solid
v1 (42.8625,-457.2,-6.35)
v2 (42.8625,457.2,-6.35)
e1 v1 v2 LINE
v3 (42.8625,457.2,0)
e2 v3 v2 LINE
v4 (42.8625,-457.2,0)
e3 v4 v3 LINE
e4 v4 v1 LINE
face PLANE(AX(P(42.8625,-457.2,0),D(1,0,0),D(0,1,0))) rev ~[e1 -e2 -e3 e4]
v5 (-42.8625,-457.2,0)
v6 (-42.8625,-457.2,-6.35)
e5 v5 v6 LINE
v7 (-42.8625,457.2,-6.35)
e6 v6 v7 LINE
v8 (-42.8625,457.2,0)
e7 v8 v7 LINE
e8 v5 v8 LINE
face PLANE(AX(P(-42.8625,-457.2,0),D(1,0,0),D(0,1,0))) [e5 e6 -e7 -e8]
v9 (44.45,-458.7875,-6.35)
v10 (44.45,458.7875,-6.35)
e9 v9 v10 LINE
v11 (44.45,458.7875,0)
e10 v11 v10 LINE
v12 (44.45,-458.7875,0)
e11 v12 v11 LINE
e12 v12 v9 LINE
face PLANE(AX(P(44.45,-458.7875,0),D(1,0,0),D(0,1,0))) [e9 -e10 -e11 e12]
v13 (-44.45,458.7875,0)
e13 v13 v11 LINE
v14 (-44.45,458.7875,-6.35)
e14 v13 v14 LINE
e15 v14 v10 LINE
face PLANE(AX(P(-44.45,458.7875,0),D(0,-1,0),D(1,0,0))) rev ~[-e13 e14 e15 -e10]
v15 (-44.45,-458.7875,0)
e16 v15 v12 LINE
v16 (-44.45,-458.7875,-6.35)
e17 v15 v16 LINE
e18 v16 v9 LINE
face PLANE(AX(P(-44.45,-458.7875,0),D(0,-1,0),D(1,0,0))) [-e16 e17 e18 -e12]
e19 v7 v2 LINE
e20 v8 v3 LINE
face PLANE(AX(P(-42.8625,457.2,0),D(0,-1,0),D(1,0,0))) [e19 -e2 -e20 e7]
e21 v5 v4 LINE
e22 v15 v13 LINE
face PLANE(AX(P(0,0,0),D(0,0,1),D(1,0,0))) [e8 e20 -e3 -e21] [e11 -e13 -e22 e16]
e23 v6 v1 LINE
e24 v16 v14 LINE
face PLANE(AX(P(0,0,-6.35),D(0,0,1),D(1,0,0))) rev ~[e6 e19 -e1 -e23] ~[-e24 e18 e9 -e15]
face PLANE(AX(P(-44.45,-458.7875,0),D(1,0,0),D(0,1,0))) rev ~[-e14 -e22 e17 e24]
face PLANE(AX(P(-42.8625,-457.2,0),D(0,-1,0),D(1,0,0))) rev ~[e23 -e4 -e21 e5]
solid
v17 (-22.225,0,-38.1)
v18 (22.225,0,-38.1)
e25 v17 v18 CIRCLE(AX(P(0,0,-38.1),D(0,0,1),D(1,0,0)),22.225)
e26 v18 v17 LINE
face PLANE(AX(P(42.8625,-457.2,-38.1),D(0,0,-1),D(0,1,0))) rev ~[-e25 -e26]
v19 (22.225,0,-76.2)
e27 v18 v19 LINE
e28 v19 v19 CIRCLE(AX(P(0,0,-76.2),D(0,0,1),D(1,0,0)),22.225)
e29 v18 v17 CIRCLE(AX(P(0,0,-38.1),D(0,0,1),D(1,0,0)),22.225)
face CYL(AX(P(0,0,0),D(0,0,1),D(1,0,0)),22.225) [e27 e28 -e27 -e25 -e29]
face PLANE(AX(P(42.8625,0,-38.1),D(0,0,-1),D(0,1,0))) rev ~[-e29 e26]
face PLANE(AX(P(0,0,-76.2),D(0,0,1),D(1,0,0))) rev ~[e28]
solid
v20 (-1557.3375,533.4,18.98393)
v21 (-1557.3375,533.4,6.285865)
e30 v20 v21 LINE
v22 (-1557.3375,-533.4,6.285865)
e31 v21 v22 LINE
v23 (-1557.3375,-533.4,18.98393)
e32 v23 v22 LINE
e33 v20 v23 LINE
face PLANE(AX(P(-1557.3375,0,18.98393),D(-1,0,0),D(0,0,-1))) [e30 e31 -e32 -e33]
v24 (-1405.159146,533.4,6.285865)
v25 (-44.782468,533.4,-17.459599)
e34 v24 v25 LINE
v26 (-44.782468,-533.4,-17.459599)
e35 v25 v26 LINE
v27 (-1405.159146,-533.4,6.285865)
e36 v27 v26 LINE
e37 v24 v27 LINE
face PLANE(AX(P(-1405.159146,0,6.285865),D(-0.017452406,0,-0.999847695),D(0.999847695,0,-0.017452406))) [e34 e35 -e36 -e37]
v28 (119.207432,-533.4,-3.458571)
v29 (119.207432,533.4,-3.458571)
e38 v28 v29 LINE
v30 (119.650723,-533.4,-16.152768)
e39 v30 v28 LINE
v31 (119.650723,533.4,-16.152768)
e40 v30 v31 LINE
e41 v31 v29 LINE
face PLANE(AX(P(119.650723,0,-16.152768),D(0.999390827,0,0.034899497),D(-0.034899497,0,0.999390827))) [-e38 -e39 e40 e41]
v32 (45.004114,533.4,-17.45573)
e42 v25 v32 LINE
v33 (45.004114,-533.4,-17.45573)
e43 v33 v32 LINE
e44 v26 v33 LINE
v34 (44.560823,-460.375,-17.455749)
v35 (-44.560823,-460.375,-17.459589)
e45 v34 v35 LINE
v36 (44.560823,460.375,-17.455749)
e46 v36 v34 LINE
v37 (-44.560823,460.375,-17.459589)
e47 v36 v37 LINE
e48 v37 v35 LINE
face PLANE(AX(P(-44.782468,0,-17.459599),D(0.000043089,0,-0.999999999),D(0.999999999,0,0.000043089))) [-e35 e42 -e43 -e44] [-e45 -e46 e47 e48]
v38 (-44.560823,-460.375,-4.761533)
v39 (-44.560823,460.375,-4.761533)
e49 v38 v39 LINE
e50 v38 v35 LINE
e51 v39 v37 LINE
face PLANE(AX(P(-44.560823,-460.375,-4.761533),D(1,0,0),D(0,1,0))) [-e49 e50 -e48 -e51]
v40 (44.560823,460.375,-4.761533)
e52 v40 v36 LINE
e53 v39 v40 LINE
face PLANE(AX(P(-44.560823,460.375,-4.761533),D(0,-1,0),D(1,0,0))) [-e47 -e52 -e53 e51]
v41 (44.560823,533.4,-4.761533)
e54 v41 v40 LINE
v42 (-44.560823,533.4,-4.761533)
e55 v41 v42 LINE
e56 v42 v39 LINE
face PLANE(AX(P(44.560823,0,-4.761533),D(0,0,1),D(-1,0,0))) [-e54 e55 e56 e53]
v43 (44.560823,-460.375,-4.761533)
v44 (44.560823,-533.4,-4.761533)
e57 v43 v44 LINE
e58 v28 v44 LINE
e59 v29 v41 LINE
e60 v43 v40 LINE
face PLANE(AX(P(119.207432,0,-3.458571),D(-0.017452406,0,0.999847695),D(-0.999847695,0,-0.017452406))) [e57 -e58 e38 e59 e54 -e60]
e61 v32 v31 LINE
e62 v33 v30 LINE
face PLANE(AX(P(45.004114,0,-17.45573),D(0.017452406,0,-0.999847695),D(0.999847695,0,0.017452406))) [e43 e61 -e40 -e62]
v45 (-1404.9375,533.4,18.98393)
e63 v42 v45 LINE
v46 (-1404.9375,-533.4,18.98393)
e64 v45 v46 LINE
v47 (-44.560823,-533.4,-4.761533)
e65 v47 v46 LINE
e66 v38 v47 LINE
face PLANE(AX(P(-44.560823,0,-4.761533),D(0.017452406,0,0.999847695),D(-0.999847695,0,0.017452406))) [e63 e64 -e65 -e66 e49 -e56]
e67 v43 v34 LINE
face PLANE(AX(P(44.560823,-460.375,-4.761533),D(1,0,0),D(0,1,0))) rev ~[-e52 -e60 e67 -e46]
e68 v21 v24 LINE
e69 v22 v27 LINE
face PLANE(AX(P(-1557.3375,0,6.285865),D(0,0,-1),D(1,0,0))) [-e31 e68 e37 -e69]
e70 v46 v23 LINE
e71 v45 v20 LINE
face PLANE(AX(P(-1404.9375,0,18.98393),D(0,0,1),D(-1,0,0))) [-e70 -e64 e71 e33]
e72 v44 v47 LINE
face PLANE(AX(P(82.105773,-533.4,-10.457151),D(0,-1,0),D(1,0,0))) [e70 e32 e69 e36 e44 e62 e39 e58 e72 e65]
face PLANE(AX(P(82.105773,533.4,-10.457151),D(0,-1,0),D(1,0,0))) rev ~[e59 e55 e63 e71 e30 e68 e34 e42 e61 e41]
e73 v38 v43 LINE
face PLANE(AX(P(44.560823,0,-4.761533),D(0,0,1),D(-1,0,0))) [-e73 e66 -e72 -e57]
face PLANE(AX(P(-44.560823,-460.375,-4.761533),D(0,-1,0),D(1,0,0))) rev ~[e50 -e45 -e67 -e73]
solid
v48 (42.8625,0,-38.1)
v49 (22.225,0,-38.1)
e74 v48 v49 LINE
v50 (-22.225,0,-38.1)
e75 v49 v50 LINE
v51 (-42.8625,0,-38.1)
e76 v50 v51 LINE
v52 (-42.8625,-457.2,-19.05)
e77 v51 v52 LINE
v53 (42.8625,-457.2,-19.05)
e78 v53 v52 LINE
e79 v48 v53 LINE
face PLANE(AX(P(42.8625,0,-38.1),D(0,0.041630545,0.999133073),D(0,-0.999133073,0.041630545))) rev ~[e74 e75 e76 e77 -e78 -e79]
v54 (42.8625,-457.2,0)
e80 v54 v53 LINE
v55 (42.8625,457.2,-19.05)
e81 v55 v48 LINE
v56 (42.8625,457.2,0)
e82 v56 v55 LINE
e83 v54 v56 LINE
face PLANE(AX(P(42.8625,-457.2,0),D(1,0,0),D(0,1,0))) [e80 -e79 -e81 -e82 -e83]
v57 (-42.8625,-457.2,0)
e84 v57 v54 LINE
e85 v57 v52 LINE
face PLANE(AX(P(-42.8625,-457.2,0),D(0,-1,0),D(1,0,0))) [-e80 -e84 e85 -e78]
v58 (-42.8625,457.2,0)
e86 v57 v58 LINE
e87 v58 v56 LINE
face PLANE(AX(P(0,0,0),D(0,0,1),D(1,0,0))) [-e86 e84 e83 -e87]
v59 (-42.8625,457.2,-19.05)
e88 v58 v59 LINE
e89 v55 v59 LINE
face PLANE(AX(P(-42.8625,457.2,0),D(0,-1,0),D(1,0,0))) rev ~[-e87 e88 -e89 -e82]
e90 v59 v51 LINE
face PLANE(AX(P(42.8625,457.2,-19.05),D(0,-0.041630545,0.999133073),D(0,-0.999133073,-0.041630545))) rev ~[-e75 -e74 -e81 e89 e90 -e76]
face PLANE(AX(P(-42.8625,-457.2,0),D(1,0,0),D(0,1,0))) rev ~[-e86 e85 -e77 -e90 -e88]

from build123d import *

# Parameters (mm, degrees)
F0_W           = 85.725
F0_H           = 914.4
F0_R           = 25.4
F0_R_2         = 22.225
F1_DEPTH       = 38.1
F2_DEPTH       = 76.2
F4_DEPTH       = 85.726
F5_W           = 88.9
F5_H           = 917.575
F5_W_2         = 85.725
F5_H_2         = 914.4
F6_DEPTH       = 6.35
F10_DEPTH      = 533.4
F10_DEPTH_BACK = 533.4
F11_W          = 89.1216455618
F11_H          = 920.75
F12_DEPTH      = 71.4394671358


# Not quite as in the source:
# - a length typed as a fraction of an inch, garbled in the dataset ("3 / 203.2 mm" for 3/8 in), is restored
# - a pattern or mirror of a feature is missing from the dataset's text; its kind, count and spacing are read off the source's solid


with BuildPart() as f1:
    # F0 (on Top) → F1 (new body)
    with BuildSketch(Plane.XY):
        Rectangle(F0_W, F0_H)
        Circle(F0_R, mode=Mode.SUBTRACT)
        Circle(F0_R)
        Circle(F0_R_2, mode=Mode.SUBTRACT)
        Circle(F0_R_2)
    extrude(amount=-F1_DEPTH)



with BuildPart() as f2:
    # F0 (on Top) → F2 (new body)
    with BuildSketch(Plane.XY):
        Circle(F0_R_2)
    extrude(amount=-F2_DEPTH)


with BuildPart() as f1_1:
    add(f1.part)

    add(f2.part)  # F2_copies merges F2
    # F2_copies: F2 across plane
    add(f2.part.mirror(Plane(origin=(0, 0, -38.1), x_dir=(-1, 0, 0), z_dir=(0, 0, -1))))

    # F3 (on face) → F4 (cut, through all)
    with BuildSketch(Plane.YZ.offset(42.8625)):
        Polygon((-457.2, -38.1), (0, -38.1), (-457.2, -19.05), align=None)
        Polygon((457.2, -19.05), (0, -38.1), (457.2, -38.1), align=None)
    extrude(amount=-F4_DEPTH, mode=Mode.SUBTRACT)


with BuildPart() as f6:
    # F5 (on face) → F6 (new body)
    with BuildSketch(Plane.XY):
        Rectangle(F5_W, F5_H)
        Rectangle(F5_W_2, F5_H_2, mode=Mode.SUBTRACT)
    extrude(amount=-F6_DEPTH)


with BuildPart() as f10:
    # F9 (on Front) → F10 (new body, two sides)
    with BuildSketch(Plane.XZ) as f10_sk:
        Polygon((119.207431633, -3.4585714601), (44.5608227809, -4.7615328642), (45.0041139044, -17.4557297551), (119.6507227565, -16.1527683509), align=None)
        Polygon((-44.7824683426, -17.4595985927), (-44.5608227809, -4.7615328642), (-1404.9375, 18.9839303634), (-1404.9375, 6.285864635), (-1405.1591455618, 6.285864635), align=None)
        Polygon((-1404.9375, 6.285864635), (-1404.9375, 18.9839303634), (-1557.3375, 18.9839303634), (-1557.3375, 6.285864635), (-1405.1591455618, 6.285864635), align=None)
        Polygon((44.5608227809, -4.7615328642), (-44.5608227809, -4.7615328642), (-44.7824683426, -17.4595985927), (45.0041139044, -17.4557297551), align=None)
    extrude(amount=F10_DEPTH)
    extrude(f10_sk.sketch, amount=-F10_DEPTH_BACK)

    # F11 (on face) → F12 (cut, through all)
    with BuildSketch(Plane.XY.offset(-4.7615328642)):
        Rectangle(F11_W, F11_H)
    extrude(amount=-F12_DEPTH, mode=Mode.SUBTRACT)


solid = Compound([f1_1.part, f6.part, f10.part])
